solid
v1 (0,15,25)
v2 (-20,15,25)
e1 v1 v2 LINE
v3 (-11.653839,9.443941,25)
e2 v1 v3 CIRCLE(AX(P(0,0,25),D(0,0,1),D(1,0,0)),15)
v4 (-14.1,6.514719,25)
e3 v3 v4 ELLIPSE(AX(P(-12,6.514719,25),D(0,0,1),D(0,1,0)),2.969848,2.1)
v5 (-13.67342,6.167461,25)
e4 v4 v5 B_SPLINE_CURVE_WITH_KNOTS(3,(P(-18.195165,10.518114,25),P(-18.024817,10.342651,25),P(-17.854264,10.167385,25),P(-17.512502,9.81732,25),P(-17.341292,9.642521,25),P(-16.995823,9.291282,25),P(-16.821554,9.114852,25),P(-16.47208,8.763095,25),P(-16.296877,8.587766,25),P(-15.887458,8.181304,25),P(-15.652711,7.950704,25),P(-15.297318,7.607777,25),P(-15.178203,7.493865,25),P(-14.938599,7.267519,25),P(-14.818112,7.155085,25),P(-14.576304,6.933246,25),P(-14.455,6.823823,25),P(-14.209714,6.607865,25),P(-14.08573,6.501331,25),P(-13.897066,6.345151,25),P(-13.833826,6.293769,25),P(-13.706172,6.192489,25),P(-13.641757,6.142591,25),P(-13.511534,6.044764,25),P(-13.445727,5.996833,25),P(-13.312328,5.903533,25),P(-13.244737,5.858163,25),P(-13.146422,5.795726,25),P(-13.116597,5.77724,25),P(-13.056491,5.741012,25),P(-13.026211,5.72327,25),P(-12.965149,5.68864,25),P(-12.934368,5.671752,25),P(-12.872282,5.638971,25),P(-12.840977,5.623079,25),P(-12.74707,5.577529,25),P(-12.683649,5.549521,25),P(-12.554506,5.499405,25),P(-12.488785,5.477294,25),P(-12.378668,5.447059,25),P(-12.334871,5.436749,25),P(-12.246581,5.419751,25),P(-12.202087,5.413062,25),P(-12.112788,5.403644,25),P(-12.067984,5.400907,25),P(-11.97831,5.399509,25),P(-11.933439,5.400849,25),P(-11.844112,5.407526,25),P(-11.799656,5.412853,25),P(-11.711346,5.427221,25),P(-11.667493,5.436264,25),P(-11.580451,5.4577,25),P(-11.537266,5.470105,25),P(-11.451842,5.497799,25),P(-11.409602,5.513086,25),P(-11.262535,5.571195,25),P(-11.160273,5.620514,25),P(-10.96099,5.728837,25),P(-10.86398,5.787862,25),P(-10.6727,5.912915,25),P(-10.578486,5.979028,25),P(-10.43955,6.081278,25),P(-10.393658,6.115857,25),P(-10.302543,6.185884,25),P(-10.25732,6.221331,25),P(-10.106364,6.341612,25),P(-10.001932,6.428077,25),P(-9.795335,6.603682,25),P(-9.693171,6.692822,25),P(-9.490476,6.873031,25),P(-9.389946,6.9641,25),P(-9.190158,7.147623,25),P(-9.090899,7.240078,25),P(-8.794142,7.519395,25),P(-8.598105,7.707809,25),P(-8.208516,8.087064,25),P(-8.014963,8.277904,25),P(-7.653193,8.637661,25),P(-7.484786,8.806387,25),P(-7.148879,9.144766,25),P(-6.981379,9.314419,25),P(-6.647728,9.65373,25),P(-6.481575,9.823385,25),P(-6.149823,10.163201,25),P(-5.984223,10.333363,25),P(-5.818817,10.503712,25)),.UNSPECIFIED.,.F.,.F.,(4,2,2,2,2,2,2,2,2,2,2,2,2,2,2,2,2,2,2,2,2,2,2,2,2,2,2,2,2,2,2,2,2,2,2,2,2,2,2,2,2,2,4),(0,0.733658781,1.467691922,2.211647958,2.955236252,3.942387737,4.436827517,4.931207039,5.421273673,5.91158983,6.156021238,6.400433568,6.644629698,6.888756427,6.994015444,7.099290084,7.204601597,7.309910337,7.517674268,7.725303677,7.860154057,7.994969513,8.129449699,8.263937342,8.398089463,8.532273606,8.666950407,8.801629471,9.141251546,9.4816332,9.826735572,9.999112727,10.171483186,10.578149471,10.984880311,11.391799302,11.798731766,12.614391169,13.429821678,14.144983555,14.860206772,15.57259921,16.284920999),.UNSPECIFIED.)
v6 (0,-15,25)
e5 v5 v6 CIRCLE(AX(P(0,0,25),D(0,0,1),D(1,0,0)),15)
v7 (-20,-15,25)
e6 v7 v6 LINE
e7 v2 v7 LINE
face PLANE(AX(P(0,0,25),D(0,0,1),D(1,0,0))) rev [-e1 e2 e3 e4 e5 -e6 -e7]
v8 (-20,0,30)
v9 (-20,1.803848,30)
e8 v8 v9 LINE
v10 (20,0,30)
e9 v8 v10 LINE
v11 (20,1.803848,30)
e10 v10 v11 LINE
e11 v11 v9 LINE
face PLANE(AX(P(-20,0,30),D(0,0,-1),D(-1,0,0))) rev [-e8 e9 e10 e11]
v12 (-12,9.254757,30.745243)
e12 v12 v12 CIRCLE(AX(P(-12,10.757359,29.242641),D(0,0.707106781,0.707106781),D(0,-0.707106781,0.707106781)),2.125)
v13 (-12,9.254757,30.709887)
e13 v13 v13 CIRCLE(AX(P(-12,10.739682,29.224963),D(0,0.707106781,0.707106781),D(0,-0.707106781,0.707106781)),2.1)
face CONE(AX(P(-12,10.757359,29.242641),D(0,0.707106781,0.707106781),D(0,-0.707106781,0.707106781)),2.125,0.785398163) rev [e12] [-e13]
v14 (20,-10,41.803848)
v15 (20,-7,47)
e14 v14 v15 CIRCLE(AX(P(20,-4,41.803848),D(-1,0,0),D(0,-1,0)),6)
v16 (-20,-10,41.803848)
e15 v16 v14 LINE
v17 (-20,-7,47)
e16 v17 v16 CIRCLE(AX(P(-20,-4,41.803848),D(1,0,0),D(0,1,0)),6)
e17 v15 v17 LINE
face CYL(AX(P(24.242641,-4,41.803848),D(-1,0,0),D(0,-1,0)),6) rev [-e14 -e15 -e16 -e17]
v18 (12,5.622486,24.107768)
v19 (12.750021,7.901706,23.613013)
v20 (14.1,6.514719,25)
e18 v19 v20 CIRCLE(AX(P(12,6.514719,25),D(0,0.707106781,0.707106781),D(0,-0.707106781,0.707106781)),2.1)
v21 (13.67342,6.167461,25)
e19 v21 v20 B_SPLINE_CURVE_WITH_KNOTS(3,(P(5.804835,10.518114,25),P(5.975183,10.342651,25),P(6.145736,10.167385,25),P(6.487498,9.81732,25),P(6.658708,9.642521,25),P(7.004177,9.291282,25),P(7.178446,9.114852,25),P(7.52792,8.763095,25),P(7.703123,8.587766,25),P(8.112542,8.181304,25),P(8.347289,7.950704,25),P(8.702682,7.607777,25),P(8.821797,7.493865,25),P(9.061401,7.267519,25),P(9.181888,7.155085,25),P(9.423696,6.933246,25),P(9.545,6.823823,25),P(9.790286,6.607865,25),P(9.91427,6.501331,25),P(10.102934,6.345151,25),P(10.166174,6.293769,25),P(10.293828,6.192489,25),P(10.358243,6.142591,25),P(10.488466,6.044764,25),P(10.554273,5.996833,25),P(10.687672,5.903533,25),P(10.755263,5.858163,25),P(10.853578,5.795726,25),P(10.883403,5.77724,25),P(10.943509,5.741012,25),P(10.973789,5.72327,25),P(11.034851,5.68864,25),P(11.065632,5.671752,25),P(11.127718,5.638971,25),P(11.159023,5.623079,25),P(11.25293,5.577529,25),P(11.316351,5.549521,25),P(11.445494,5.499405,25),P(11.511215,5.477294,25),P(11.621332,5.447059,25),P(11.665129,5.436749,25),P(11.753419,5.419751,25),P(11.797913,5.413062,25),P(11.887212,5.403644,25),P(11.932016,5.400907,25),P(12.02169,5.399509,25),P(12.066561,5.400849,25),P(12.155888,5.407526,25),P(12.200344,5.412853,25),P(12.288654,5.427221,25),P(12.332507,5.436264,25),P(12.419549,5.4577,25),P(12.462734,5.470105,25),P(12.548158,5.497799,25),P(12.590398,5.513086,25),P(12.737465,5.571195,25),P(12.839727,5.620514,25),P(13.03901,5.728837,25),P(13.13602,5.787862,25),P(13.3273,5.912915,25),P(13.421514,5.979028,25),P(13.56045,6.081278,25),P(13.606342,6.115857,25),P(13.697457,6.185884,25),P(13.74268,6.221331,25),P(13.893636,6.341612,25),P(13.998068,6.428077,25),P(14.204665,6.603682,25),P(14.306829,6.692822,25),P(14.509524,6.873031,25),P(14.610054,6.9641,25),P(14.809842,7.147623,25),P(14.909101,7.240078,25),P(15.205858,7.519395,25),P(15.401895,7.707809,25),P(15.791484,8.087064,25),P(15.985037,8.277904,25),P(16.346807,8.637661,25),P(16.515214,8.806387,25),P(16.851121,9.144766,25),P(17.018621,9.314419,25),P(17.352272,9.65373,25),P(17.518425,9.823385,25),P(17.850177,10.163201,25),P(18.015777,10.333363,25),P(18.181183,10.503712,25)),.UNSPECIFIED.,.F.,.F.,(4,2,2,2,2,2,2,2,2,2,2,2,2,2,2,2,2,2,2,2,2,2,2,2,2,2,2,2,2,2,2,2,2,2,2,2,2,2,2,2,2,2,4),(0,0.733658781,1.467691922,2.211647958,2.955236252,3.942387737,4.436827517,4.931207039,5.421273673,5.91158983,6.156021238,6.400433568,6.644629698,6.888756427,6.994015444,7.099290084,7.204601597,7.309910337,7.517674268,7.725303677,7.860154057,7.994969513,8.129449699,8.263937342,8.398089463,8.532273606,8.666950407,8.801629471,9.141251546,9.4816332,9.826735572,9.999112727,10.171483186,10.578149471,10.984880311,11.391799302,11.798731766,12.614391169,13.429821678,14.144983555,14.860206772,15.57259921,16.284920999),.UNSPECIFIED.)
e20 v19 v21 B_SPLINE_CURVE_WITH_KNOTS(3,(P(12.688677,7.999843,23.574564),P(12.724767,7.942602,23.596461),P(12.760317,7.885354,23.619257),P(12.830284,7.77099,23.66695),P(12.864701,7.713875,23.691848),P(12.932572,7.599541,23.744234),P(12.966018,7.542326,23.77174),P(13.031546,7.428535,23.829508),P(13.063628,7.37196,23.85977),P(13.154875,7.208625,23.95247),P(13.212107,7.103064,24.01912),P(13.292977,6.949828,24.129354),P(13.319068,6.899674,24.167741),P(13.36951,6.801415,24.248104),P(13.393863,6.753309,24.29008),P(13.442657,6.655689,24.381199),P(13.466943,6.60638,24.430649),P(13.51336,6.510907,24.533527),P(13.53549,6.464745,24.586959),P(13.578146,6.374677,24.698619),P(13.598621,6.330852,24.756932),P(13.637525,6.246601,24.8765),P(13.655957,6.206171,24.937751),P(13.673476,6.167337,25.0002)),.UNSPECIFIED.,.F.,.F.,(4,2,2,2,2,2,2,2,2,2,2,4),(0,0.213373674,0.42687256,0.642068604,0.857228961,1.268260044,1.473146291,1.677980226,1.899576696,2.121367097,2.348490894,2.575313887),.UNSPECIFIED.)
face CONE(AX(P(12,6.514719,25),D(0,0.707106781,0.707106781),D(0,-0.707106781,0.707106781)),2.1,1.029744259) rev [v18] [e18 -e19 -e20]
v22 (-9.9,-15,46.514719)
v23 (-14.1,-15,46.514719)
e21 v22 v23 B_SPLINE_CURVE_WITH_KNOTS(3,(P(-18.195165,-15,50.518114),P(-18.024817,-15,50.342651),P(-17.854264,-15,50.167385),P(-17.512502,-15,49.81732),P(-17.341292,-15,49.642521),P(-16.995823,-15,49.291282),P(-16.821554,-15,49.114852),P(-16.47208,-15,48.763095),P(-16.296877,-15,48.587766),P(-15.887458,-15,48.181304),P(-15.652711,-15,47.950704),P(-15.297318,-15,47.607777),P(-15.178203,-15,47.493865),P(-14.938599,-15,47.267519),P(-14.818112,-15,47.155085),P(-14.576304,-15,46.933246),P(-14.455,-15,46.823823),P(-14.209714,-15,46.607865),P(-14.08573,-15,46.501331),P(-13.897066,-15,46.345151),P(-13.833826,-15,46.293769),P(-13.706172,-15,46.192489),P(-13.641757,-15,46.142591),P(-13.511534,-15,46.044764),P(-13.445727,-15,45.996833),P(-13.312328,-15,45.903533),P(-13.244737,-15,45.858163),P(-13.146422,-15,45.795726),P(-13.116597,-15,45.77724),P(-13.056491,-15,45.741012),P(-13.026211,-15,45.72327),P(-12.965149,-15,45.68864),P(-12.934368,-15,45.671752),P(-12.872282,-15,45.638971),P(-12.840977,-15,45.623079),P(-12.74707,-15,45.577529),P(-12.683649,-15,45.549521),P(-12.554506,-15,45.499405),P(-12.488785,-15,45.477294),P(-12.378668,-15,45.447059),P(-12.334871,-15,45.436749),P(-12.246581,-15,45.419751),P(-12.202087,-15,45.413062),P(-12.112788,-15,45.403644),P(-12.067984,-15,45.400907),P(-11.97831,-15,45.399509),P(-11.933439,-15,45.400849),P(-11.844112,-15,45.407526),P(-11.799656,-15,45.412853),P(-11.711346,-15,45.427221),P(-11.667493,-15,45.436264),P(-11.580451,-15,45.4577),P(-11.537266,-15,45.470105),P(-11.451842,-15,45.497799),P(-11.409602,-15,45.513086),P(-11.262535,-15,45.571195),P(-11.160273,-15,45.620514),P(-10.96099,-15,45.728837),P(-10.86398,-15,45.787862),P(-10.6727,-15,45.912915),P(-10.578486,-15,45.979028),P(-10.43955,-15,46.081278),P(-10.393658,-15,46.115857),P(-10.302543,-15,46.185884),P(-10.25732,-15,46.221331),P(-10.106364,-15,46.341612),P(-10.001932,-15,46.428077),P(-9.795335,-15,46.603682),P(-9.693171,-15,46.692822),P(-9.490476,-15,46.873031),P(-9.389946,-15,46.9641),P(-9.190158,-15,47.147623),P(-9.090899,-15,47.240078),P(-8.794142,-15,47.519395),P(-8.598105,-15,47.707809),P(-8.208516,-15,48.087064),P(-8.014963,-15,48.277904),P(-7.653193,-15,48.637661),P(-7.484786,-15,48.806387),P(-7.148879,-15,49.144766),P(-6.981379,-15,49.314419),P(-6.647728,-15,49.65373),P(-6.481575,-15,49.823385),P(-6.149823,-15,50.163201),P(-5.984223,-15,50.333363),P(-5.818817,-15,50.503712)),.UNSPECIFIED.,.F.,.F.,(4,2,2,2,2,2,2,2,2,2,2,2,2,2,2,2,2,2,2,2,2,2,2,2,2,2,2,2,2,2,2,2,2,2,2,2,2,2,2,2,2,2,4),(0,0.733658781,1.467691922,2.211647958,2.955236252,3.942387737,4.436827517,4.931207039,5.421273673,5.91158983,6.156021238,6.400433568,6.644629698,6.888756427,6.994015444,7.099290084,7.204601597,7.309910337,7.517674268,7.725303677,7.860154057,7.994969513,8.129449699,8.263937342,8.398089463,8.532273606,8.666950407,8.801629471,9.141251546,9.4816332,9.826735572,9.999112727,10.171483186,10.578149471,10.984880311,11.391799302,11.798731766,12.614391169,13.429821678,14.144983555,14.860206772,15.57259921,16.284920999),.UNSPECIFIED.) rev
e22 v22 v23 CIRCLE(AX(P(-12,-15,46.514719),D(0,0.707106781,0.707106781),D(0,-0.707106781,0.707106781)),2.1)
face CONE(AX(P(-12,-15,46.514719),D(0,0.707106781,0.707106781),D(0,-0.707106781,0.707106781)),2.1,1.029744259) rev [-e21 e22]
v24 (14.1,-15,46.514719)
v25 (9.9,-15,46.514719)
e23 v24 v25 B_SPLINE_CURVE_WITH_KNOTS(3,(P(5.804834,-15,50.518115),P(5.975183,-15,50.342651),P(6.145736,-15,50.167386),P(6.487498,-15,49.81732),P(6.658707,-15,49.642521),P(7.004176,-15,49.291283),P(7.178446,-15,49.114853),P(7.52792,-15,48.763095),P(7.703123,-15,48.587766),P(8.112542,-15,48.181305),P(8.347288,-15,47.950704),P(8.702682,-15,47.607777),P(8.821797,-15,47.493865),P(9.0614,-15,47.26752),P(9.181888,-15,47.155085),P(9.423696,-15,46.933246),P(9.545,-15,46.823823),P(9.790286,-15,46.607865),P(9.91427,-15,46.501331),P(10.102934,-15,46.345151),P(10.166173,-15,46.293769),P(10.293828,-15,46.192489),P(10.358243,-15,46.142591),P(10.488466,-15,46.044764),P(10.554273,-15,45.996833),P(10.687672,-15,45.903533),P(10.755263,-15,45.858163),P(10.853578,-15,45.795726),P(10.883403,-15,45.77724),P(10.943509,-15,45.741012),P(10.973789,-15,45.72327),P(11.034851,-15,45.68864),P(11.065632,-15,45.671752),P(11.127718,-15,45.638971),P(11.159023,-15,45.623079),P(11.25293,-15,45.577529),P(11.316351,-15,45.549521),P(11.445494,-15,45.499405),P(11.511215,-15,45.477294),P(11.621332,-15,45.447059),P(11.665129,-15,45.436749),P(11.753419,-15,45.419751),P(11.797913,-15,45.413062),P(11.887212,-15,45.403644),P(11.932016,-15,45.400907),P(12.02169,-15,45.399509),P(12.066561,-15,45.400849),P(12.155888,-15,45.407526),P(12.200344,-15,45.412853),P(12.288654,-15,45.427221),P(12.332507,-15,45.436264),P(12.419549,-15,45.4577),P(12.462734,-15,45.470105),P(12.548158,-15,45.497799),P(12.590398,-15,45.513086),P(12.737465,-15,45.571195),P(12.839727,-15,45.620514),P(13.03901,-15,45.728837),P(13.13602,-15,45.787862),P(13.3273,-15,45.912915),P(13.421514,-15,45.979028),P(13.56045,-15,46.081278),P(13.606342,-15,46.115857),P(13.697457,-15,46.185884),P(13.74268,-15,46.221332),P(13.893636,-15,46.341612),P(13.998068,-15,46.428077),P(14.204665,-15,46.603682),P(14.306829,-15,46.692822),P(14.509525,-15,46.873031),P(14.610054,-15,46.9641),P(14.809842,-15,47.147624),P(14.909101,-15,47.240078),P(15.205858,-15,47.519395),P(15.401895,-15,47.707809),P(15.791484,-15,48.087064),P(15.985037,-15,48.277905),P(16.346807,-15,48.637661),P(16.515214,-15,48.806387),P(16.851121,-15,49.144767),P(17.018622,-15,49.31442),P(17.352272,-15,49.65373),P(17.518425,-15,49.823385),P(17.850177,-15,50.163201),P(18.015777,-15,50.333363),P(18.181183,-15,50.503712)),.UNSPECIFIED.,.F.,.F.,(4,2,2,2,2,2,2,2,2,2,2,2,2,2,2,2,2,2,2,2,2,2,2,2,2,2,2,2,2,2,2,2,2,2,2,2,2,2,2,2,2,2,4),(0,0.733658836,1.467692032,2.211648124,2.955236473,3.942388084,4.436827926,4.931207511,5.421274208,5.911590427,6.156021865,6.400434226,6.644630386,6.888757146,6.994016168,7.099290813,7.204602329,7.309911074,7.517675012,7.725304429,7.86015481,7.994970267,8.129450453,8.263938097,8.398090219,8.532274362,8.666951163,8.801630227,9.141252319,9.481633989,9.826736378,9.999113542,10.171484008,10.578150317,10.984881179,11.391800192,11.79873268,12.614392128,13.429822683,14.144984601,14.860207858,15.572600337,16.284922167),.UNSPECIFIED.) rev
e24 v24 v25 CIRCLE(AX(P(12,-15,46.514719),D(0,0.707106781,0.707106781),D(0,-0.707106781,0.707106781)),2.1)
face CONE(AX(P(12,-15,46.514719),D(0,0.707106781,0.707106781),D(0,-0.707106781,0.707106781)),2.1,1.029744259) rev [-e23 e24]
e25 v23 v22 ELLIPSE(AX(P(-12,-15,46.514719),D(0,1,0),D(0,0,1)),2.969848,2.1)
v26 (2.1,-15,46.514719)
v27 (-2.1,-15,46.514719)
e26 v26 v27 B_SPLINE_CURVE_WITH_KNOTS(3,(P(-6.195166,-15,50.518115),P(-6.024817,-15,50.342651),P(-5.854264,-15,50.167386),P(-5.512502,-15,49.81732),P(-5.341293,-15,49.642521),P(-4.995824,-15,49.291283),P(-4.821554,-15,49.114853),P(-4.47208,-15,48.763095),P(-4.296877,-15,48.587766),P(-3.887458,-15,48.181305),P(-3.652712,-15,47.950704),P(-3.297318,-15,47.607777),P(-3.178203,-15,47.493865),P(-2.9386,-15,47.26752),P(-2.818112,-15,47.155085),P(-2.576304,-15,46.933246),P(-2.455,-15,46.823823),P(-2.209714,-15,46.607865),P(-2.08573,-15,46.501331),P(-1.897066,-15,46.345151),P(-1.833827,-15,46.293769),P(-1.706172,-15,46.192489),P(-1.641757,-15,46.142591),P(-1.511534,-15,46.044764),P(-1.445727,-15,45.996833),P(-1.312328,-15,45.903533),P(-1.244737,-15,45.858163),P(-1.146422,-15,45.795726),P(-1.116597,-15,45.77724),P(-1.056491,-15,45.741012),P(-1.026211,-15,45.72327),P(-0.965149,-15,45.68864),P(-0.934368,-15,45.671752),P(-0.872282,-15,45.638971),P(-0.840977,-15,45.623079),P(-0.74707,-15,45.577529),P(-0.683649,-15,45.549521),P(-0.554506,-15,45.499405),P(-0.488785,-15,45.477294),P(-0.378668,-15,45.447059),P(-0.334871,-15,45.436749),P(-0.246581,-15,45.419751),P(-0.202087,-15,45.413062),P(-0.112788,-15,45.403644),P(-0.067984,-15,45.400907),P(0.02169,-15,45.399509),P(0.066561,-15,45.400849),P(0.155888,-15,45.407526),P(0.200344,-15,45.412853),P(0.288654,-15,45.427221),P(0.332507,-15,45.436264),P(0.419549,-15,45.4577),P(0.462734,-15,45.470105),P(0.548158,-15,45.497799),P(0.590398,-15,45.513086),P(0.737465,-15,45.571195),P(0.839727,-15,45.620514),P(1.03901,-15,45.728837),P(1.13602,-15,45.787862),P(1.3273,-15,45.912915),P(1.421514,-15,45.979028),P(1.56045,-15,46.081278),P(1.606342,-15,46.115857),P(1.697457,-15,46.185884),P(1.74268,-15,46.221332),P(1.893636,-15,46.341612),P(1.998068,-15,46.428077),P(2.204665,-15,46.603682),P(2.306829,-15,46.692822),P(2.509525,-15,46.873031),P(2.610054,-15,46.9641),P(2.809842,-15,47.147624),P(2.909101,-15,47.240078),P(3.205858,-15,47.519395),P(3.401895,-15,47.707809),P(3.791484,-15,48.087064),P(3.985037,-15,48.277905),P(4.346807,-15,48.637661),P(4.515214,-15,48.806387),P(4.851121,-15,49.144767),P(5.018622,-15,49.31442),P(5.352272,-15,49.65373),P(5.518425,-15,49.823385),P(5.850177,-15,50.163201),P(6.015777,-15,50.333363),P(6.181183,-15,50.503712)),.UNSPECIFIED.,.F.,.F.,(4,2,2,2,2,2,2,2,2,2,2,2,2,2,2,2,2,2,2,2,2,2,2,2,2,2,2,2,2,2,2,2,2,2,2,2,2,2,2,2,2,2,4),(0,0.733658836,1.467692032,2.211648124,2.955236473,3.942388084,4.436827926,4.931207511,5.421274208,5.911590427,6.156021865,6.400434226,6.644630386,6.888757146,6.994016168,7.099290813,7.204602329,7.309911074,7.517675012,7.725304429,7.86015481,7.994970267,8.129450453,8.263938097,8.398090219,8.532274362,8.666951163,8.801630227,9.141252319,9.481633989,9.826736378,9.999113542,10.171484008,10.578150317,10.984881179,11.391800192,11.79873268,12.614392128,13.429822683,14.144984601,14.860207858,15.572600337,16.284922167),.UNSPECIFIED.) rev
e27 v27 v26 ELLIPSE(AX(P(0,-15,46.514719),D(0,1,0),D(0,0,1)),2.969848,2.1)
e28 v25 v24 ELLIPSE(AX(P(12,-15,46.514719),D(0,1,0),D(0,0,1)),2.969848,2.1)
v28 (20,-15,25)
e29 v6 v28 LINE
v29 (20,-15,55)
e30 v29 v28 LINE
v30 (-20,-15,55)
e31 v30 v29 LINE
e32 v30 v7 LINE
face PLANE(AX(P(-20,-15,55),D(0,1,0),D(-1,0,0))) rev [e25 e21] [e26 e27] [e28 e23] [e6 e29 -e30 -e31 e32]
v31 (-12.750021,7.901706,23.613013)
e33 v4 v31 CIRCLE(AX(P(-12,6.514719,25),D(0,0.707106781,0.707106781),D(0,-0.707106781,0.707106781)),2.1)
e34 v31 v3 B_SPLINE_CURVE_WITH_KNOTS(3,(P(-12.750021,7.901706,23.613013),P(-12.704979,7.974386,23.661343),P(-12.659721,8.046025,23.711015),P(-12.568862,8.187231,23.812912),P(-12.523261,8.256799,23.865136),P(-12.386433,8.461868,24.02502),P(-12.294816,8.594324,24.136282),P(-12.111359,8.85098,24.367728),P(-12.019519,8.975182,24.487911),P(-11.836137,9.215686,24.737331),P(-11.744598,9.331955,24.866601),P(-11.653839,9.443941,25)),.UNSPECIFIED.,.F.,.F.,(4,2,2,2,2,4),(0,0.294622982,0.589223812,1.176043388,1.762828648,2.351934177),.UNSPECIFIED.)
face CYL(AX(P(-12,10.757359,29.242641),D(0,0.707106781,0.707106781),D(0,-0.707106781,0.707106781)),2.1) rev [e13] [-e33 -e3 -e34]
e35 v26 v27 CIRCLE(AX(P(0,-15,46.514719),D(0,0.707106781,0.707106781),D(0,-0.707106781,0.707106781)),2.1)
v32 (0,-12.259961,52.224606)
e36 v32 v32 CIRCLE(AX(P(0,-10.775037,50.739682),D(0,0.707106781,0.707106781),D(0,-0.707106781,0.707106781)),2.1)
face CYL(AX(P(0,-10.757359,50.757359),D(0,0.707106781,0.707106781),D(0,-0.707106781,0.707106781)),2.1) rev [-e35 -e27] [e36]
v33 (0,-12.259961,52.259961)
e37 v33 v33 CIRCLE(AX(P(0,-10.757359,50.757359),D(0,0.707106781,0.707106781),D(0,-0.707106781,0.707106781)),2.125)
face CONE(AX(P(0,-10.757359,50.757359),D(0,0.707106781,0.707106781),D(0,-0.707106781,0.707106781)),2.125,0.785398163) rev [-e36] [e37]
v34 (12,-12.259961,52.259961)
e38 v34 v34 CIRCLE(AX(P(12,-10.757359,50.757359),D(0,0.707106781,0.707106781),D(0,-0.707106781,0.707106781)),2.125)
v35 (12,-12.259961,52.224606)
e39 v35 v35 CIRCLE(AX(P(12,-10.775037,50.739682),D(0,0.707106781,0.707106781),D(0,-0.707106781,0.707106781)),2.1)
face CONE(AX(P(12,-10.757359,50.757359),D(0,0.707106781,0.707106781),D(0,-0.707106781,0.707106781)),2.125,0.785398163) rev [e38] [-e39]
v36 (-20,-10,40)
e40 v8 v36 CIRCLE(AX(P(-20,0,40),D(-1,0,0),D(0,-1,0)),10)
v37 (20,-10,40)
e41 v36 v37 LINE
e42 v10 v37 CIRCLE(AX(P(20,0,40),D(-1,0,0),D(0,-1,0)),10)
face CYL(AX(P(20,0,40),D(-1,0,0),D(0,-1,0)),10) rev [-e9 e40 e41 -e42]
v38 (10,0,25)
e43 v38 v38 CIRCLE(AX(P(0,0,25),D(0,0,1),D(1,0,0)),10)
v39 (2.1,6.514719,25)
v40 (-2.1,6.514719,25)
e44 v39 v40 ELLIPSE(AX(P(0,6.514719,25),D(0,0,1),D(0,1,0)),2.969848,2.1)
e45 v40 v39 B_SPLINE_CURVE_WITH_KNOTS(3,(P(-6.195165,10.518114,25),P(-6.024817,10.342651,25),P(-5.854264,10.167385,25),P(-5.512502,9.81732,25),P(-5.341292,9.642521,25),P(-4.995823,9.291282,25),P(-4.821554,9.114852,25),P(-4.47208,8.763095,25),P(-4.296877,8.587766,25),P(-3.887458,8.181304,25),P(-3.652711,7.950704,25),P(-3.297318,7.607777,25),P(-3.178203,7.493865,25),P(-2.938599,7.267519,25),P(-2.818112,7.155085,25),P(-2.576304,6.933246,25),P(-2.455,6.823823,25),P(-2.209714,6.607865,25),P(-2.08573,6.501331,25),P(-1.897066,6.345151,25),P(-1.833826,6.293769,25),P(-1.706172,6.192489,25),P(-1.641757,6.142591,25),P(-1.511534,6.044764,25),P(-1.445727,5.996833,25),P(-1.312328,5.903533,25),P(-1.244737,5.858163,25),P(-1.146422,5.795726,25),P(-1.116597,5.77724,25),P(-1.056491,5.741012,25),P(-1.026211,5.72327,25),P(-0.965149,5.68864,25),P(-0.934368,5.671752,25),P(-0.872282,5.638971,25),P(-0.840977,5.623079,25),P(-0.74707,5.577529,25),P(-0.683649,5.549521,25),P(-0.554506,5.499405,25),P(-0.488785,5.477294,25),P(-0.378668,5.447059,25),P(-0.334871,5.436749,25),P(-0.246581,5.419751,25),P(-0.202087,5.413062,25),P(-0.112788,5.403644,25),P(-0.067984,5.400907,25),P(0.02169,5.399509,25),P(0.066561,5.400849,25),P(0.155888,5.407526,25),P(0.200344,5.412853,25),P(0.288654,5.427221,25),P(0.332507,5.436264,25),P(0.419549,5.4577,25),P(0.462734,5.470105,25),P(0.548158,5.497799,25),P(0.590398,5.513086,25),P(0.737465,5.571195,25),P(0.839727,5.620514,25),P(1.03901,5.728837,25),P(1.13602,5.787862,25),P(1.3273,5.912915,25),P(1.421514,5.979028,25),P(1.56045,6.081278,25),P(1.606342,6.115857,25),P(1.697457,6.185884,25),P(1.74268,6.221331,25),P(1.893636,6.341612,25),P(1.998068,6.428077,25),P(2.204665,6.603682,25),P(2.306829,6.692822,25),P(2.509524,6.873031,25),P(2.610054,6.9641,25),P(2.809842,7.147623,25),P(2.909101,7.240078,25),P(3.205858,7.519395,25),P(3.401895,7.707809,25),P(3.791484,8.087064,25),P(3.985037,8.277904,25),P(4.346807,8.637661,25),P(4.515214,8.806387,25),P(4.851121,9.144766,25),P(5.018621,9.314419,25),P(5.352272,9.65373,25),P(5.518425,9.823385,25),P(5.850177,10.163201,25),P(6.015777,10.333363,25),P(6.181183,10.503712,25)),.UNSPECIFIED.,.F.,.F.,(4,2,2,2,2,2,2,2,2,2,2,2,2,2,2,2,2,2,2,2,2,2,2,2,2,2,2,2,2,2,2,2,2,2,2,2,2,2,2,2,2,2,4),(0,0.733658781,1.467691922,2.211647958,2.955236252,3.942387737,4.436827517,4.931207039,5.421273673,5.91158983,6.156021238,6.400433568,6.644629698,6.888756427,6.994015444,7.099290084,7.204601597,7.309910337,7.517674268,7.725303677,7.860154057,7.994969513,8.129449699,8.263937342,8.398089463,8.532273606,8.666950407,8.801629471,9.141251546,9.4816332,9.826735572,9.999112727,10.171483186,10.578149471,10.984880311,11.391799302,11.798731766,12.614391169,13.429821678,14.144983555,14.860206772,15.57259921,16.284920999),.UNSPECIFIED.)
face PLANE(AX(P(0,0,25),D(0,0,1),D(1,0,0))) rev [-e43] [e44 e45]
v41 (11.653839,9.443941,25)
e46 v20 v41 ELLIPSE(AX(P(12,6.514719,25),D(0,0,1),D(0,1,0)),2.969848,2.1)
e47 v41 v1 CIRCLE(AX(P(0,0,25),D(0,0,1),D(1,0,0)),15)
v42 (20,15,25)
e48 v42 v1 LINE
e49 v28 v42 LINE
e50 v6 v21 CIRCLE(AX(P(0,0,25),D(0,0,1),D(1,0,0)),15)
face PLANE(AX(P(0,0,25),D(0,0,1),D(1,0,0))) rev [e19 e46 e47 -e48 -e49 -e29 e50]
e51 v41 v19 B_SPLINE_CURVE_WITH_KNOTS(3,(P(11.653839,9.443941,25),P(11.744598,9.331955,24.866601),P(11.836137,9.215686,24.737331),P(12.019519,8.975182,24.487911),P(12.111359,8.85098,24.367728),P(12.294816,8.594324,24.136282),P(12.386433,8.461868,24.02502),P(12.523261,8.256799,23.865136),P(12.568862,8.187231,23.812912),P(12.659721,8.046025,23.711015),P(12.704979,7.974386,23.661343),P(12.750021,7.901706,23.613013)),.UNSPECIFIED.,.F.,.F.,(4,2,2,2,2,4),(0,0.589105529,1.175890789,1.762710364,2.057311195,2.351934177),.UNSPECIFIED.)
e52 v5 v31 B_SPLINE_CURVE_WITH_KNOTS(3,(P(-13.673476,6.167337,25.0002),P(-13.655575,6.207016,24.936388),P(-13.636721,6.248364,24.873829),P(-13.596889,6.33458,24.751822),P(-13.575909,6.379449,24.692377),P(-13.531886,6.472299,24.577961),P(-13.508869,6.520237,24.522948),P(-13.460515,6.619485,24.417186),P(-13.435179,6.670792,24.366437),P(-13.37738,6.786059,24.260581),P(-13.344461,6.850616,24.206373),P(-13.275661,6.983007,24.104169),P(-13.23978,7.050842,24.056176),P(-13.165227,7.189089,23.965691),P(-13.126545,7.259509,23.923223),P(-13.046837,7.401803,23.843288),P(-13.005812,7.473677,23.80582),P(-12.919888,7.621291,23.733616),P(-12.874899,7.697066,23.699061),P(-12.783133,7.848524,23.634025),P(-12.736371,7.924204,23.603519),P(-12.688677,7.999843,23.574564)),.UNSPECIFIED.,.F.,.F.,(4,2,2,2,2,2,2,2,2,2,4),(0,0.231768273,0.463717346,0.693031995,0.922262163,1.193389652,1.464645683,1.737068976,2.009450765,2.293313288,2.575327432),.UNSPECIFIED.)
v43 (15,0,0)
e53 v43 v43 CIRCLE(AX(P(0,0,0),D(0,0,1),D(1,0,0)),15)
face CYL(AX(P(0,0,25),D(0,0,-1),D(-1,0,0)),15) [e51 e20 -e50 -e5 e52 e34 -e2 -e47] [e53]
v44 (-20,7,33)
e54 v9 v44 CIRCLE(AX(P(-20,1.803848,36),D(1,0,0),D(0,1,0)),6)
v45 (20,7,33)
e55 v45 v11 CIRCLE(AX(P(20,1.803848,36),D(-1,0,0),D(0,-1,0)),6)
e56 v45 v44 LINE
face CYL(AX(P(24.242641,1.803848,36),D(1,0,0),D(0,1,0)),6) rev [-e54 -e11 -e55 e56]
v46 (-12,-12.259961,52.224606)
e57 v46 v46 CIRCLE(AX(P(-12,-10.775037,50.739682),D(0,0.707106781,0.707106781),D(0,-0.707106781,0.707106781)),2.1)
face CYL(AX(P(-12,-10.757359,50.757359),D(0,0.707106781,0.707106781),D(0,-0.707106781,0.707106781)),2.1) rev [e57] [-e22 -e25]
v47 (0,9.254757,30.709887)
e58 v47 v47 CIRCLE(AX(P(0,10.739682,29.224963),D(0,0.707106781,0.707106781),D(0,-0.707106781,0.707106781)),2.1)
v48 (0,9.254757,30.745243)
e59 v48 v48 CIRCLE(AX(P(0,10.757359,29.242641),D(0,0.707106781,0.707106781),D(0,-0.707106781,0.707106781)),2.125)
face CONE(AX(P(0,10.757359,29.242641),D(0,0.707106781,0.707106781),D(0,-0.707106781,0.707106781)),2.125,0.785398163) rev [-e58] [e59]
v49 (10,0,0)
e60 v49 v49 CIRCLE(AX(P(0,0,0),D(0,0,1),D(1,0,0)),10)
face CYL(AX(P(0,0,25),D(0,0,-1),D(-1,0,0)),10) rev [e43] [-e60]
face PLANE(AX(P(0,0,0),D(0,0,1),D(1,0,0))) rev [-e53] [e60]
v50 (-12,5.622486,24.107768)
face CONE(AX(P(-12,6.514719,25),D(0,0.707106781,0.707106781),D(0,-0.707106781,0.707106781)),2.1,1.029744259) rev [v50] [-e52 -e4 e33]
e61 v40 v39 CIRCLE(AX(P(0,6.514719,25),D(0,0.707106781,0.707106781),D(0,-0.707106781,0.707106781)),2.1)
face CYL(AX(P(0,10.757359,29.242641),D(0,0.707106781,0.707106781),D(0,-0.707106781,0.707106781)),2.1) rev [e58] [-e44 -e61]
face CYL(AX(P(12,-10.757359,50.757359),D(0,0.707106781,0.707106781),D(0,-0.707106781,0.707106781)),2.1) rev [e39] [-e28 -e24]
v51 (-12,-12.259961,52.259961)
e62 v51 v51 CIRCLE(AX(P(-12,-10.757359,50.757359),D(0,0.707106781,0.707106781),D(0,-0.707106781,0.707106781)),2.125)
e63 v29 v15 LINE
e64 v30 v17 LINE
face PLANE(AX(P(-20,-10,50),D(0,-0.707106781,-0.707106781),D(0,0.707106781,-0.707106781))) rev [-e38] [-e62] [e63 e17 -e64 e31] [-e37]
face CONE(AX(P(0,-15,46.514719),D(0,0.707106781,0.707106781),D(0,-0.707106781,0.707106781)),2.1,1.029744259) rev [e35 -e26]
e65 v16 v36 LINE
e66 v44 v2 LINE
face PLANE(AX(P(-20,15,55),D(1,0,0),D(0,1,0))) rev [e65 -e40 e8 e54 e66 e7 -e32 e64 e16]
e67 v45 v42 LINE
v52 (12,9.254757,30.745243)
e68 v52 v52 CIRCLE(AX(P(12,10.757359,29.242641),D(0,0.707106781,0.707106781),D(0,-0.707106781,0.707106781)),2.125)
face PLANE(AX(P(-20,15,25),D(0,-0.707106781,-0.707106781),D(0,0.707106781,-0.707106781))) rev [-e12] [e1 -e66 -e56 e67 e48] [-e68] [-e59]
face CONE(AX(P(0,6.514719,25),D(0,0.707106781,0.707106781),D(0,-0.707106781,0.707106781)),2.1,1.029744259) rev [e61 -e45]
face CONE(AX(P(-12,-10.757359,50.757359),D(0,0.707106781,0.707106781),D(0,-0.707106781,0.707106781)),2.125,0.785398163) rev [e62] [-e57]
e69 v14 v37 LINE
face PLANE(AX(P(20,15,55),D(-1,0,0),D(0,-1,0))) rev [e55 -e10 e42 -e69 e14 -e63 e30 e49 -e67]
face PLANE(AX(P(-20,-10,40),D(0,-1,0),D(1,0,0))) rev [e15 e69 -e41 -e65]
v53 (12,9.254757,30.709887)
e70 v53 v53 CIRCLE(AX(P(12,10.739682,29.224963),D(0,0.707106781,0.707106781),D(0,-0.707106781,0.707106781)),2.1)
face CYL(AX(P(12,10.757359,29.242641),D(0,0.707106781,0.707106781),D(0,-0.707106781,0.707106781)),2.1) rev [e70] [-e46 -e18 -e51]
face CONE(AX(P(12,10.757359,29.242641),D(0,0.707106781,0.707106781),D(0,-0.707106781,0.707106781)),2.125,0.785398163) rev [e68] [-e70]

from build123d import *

# Parameters (mm, degrees)
SKETCH1_R                            = 15
SKETCH1_R_2                          = 10
BOSS_EXTRUDE1_DEPTH                  = 25
SKETCH2_W                            = 40
SKETCH2_H                            = 30
BOSS_EXTRUDE2_DEPTH                  = 30
SKETCH3_R                            = 10
CUT_EXTRUDE1_DEPTH                   = 70.641941386
CUT_EXTRUDE2_DEPTH                   = 70.641941386
CUT_EXTRUDE6_DEPTH                   = 70.641941386
BOSS_EXTRUDE3_DEPTH                  = 40
FILLET1_R                            = 6
F_4_2_4_2_DIAMETER_HOLE1_D           = 4.2
F_4_2_4_2_DIAMETER_HOLE1_DEPTH       = 6
F_4_2_4_2_DIAMETER_HOLE1_CSINK_D     = 4.25
F_4_2_4_2_DIAMETER_HOLE1_CSINK_ANGLE = 90
F_4_2_4_2_DIAMETER_HOLE1_TIP         = 1.2618073


with BuildPart() as part:
    # Sketch1 → Boss-Extrude1 (new body)
    with BuildSketch(Plane.XY):
        Circle(SKETCH1_R)
        Circle(SKETCH1_R_2, mode=Mode.SUBTRACT)
    extrude(amount=BOSS_EXTRUDE1_DEPTH)

    # Sketch2 → Boss-Extrude2 (add)
    with BuildSketch(Plane.XY.offset(25)):
        Rectangle(SKETCH2_W, SKETCH2_H)
    extrude(amount=BOSS_EXTRUDE2_DEPTH)

    # Sketch3 → Cut-Extrude1 (cut, through all)
    with BuildSketch(Plane.ZY.offset(20)):
        with Locations(Location((40, 0, 0), (0, 0, 270))):
            Circle(SKETCH3_R)
    extrude(amount=-CUT_EXTRUDE1_DEPTH, mode=Mode.SUBTRACT)

    # Sketch4 → Cut-Extrude2 (cut, through all)
    with BuildSketch(Plane(origin=(20, 0, 0), x_dir=(0, 0, -1), z_dir=(1, 0, 0))):
        with BuildLine():
            Line((-30, 0), (-30, 15))
            Line((-30, 15), (-55, 15))
            Line((-55, 15), (-55, -10))
            Line((-55, -10), (-40, -10))
            ThreePointArc((-40, -10), (-32.928932188, -7.071067812), (-30, 0))
        make_face()
    extrude(amount=-CUT_EXTRUDE2_DEPTH, mode=Mode.SUBTRACT)

    # Sketch6 → Cut-Extrude6 (cut, through all)
    with BuildSketch(Plane(origin=(20, 0, 0), x_dir=(0, 0, -1), z_dir=(1, 0, 0))):
        Polygon((-25, 15), (-30, 10), (-30, 15), align=None)
        Polygon((-55, -10), (-55, -15), (-50, -10), align=None)
    extrude(amount=-CUT_EXTRUDE6_DEPTH, mode=Mode.SUBTRACT)

    # Sketch7 → Boss-Extrude3 (add)
    with BuildSketch(Plane.ZY.offset(20)):
        Polygon((30, 10), (33, 7), (30, 7), align=None)
        Polygon((50, -10), (47, -7), (47, -10), align=None)
    extrude(amount=-BOSS_EXTRUDE3_DEPTH)

    # Fillet1
    # the kernel refuses this fillet: 6 mm, written as the material it adds along each edge
    with BuildSketch(Plane(origin=(-20, -10, 47), x_dir=(0, 1, 0), z_dir=(1, 0, 0))) as fillet1_piece_1_section:
        with BuildLine():
            CenterArc((6, -5.196152423), FILLET1_R, 120, 60)
            Line((0, -5.196152423), (-0.12, -5.196152423))
            Line((-0.12, -5.196152423), (-0.12, 0))
            Line((-0.12, 0), (0, 0.12))
            ThreePointArc((0, 0.12), (1.5, 0.12), (2.94, 0.103923048))
            Line((2.94, 0.103923048), (3, 0))
        make_face()
    fillet1_piece_1 = extrude(amount=40, mode=Mode.PRIVATE)
    fillet1_piece_1 = split(fillet1_piece_1, bisect_by=Plane(origin=(0, -7.462685522, 47.462685522), z_dir=(0, -0.7071067811865475, -0.7071067811865477)), keep=Keep.TOP, mode=Mode.PRIVATE)
    add(fillet1_piece_1)
    with BuildSketch(Plane(origin=(-20, 7, 30), x_dir=(0, -1, 0), z_dir=(1, 0, 0))) as fillet1_piece_2_section:
        with BuildLine():
            CenterArc((5.196152423, -6), FILLET1_R, 90, 60)
            Line((0, -3), (-0.103923048, -2.94))
            ThreePointArc((-0.103923048, -2.94), (-0.12, -1.5), (-0.12, 0))
            Line((-0.12, 0), (0, 0.12))
            Line((0, 0.12), (5.196152423, 0.12))
            Line((5.196152423, 0.12), (5.196152423, 0))
        make_face()
    fillet1_piece_2 = extrude(amount=40, mode=Mode.PRIVATE)
    fillet1_piece_2 = split(fillet1_piece_2, bisect_by=Plane(origin=(0, 7.462685522, 32.537314478), z_dir=(0, -0.7071067811865477, -0.7071067811865475)), keep=Keep.TOP, mode=Mode.PRIVATE)
    add(fillet1_piece_2)

    # Ø4.2 (4.2) Diameter Hole1
    with Locations(Plane(origin=(0, 20, 20), x_dir=(1, 0, 0), z_dir=(0, 0.7071067811865475, 0.7071067811865477))):
        with Locations((12, -43.497474683), (0, -43.497474683), (-12, -43.497474683), (-12, -13.071067812), (0, -13.071067812), (12, -13.071067812)):
            CounterSinkHole(F_4_2_4_2_DIAMETER_HOLE1_D / 2, F_4_2_4_2_DIAMETER_HOLE1_CSINK_D / 2, depth=F_4_2_4_2_DIAMETER_HOLE1_DEPTH, counter_sink_angle=F_4_2_4_2_DIAMETER_HOLE1_CSINK_ANGLE)
            with Locations((0, 0, -(F_4_2_4_2_DIAMETER_HOLE1_DEPTH + F_4_2_4_2_DIAMETER_HOLE1_TIP / 2))):  # 118° drill point
                Cone(0, F_4_2_4_2_DIAMETER_HOLE1_D / 2, F_4_2_4_2_DIAMETER_HOLE1_TIP, mode=Mode.SUBTRACT)


solid = part.part
